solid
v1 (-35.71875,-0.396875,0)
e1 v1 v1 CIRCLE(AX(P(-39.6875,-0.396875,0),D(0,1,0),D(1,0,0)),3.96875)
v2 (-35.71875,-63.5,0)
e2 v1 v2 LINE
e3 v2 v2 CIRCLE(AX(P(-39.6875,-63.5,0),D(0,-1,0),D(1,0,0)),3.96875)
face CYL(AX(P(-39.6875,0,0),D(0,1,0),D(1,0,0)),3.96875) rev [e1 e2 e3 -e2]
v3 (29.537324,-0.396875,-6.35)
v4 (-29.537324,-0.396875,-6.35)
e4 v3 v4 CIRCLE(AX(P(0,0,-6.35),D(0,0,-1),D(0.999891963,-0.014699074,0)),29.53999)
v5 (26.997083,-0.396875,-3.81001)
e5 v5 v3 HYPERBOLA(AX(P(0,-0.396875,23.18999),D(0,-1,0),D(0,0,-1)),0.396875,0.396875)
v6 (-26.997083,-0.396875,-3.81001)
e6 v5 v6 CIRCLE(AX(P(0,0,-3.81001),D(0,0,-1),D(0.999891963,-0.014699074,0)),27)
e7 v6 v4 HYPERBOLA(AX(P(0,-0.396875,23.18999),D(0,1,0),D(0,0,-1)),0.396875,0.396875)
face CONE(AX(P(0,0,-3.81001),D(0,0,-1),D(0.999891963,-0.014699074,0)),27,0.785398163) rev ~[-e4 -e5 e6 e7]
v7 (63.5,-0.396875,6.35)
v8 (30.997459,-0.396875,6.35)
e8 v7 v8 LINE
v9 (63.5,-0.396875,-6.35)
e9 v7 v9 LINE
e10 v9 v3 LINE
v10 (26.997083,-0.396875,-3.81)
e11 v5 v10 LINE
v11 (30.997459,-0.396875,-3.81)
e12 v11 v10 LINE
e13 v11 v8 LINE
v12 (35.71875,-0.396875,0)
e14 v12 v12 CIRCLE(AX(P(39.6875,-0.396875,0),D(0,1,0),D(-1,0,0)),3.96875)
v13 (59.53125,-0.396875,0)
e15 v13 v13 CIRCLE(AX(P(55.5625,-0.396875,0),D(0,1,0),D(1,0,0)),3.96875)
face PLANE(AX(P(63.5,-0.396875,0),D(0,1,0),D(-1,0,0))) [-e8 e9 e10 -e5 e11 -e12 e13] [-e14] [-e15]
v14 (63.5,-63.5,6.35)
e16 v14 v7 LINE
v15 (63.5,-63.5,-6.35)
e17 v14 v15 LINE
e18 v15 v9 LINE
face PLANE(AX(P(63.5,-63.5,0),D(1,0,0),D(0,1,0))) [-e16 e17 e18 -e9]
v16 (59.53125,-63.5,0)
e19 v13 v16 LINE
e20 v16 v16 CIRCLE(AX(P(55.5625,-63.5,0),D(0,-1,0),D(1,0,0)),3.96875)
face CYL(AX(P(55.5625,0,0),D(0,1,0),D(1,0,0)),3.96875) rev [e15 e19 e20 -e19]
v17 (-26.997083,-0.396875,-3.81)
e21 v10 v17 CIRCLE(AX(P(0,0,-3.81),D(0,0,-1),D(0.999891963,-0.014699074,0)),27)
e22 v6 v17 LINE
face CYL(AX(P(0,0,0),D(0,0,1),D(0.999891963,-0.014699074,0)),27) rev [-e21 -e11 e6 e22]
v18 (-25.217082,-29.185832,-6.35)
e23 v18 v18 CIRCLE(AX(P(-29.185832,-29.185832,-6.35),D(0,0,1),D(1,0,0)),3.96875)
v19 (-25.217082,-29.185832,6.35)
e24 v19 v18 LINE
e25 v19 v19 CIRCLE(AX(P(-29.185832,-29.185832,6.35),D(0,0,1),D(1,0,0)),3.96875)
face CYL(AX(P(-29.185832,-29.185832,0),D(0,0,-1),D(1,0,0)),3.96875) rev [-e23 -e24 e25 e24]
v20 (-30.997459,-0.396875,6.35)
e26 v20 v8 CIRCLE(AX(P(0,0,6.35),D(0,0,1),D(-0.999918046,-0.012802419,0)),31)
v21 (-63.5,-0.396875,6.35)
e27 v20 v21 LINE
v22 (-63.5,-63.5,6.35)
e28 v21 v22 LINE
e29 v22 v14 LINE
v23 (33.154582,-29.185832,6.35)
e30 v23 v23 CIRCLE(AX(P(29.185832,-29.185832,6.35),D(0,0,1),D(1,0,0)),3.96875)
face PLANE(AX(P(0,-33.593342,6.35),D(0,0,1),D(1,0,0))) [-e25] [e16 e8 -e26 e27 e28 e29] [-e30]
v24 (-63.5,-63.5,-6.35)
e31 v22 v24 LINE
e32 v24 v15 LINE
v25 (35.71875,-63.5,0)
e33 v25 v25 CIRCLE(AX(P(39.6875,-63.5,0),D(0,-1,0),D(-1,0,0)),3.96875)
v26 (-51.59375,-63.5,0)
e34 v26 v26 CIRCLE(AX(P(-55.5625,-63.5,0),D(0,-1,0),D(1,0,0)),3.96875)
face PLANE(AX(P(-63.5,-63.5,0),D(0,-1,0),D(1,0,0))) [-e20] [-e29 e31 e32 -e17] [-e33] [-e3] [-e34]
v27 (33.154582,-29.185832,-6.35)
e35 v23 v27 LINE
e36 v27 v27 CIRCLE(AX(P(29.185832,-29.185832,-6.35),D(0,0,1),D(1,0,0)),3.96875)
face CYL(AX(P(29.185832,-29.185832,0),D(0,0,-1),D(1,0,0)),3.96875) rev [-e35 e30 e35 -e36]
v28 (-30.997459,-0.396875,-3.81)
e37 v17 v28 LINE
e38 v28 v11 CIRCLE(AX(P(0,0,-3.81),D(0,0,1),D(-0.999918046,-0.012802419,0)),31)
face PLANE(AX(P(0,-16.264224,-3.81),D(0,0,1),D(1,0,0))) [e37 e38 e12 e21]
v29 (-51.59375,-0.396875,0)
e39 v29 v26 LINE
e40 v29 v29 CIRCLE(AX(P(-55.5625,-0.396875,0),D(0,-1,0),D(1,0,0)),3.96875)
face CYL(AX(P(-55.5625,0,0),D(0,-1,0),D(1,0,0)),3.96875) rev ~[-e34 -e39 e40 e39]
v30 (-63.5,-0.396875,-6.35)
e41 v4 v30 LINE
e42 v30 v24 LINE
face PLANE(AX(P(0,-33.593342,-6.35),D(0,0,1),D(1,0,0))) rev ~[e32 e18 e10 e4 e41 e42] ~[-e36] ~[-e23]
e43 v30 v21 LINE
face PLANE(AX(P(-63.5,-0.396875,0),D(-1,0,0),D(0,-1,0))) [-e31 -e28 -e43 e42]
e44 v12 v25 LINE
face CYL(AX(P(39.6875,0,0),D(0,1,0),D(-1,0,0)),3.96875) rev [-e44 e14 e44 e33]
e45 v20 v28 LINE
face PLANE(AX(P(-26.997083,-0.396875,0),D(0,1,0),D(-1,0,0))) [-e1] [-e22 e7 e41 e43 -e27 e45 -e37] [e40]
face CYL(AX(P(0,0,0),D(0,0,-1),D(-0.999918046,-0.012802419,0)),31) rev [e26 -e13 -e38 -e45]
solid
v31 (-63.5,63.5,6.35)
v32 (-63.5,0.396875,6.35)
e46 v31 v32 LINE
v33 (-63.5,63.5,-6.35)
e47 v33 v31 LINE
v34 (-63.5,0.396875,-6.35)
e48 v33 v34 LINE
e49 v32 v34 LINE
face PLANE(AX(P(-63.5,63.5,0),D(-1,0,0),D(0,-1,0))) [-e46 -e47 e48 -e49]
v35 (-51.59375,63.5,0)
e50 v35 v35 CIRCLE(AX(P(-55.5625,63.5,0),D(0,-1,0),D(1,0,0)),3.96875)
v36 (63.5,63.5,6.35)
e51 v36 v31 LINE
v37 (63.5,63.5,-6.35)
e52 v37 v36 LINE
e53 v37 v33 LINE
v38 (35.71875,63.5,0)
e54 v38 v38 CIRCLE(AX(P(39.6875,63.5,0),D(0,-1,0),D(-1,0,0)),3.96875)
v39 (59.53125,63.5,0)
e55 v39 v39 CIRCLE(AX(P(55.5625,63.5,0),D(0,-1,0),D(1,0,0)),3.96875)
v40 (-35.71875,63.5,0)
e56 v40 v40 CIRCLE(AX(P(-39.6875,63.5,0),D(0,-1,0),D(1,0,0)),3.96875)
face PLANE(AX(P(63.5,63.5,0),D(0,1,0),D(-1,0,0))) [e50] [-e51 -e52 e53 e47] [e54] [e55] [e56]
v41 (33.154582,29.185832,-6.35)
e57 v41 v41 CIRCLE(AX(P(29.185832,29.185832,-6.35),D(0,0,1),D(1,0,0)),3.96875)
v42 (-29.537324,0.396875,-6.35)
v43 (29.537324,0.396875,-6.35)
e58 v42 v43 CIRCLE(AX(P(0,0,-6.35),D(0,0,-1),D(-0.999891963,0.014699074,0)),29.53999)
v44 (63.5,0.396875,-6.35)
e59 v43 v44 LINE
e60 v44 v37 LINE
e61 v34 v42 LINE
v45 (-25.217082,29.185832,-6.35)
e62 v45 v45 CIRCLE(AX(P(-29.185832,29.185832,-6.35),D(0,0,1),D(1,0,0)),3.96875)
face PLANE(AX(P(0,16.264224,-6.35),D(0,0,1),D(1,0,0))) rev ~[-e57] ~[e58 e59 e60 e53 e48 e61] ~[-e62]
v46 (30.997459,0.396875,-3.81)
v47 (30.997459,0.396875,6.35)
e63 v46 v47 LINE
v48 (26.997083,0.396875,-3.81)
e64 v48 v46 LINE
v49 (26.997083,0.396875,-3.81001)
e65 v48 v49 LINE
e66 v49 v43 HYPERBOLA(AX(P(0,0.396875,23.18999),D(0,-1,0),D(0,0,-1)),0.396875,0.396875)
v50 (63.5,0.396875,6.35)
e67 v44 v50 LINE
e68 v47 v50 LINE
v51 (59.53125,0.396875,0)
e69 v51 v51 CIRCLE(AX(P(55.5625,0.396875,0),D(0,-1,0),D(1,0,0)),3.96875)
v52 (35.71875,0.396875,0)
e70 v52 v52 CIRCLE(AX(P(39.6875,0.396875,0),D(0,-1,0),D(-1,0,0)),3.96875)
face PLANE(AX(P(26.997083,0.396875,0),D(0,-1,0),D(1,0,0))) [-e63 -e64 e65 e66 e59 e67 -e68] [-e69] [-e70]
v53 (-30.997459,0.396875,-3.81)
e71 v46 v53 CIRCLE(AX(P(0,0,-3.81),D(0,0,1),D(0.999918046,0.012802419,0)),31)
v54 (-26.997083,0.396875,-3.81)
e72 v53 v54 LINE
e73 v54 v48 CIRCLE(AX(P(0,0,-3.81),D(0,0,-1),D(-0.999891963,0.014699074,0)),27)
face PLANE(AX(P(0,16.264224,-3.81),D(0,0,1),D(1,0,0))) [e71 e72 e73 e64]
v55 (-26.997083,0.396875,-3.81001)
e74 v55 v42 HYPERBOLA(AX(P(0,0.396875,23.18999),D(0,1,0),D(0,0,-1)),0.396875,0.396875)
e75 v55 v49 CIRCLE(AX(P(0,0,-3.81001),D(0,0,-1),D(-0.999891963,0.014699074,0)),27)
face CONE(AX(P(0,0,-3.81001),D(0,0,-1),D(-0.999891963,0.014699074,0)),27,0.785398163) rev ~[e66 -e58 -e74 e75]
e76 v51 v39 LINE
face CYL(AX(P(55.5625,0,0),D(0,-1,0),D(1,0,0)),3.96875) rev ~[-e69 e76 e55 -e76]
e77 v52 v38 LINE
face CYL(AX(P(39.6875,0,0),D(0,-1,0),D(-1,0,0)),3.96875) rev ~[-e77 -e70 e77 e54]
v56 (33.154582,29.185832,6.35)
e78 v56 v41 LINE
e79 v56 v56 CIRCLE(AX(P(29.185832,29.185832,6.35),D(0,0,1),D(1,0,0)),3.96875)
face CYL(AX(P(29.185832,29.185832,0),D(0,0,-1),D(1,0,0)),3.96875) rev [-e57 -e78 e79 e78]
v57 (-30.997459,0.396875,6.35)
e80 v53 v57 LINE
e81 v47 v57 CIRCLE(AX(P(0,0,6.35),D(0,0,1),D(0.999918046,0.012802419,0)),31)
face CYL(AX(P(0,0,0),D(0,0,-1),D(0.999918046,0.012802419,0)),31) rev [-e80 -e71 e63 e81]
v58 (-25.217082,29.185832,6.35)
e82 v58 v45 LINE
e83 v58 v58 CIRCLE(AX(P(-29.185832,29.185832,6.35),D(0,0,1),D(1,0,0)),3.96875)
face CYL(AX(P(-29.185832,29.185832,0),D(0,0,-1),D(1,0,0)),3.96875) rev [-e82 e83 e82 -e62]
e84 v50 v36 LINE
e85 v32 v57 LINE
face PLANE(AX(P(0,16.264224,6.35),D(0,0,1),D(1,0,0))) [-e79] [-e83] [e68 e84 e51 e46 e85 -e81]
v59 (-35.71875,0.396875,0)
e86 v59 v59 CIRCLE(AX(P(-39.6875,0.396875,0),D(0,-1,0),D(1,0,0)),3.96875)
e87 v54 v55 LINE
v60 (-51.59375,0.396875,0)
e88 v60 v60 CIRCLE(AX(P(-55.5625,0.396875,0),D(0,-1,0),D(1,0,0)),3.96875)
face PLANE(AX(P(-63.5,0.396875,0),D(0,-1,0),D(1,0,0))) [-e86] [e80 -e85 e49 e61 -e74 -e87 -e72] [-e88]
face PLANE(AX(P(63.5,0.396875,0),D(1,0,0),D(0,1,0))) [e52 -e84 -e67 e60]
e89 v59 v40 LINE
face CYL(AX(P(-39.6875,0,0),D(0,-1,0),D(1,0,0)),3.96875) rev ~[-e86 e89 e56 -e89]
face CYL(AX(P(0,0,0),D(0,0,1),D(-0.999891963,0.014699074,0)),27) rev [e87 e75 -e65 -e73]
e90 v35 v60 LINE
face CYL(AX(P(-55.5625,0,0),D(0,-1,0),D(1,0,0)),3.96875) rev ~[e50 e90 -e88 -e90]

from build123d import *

# Parameters (mm, degrees)
F0_R          = 3.96875
F1_DEPTH      = 6.35
F2_DEPTH      = 3.81
F2_DEPTH_BACK = 6.35
F3_SIZE       = 2.53999
F3_2_SIZE     = 2.53999
F4_R          = 3.96875
F5_DEPTH      = 63.5


# Not quite as in the source:
# - a fillet or chamfer is up to 0.001 mm smaller than in the source, because OpenCascade refuses the exact size


with BuildPart() as f1:
    # F0 (on Top) → F1 (new body, symmetric)
    with BuildSketch(Plane.XY):
        with BuildLine():
            Line((26.9970829949, 0.396875), (30.9974594158, 0.396875))
            ThreePointArc((30.9974594158, 0.396875), (0, 31), (-30.9974594158, 0.396875))
            Line((-30.9974594158, 0.396875), (-26.9970829949, 0.396875))
            ThreePointArc((-26.9970829949, 0.396875), (0, 27), (26.9970829949, 0.396875))
        make_face()
        with BuildLine():
            ThreePointArc((-30.9974594158, 0.396875), (0, 31), (30.9974594158, 0.396875))
            Line((30.9974594158, 0.396875), (63.5, 0.396875))
            Line((63.5, 0.396875), (63.5, 63.5))
            Line((63.5, 63.5), (-63.5, 63.5))
            Line((-63.5, 63.5), (-63.5, 0.396875))
            Line((-63.5, 0.396875), (-30.9974594158, 0.396875))
        make_face()
        with Locations((-29.1858323935, 29.1858323935)):
            Circle(F0_R, mode=Mode.SUBTRACT)
        with Locations((29.1858323935, 29.1858323935)):
            Circle(F0_R, mode=Mode.SUBTRACT)
    extrude(amount=F1_DEPTH, both=True)


with BuildPart() as f1b:
    # F0 (on Top) → F1, piece 2 (new body, symmetric)
    with BuildSketch(Plane.XY):
        with BuildLine():
            Line((63.5, -0.396875), (30.9974594158, -0.396875))
            ThreePointArc((30.9974594158, -0.396875), (0, -31), (-30.9974594158, -0.396875))
            Line((-30.9974594158, -0.396875), (-63.5, -0.396875))
            Line((-63.5, -0.396875), (-63.5, -63.5))
            Line((-63.5, -63.5), (63.5, -63.5))
            Line((63.5, -63.5), (63.5, -0.396875))
        make_face()
        with Locations((-29.1858323935, -29.1858323935)):
            Circle(F0_R, mode=Mode.SUBTRACT)
        with Locations((29.1858323935, -29.1858323935)):
            Circle(F0_R, mode=Mode.SUBTRACT)
        with BuildLine():
            ThreePointArc((-30.9974594158, -0.396875), (0, -31), (30.9974594158, -0.396875))
            Line((30.9974594158, -0.396875), (26.9970829949, -0.396875))
            ThreePointArc((26.9970829949, -0.396875), (0, -27), (-26.9970829949, -0.396875))
            Line((-26.9970829949, -0.396875), (-30.9974594158, -0.396875))
        make_face()
    extrude(amount=F1_DEPTH, both=True)


with BuildPart() as f2_tool:
    # F0 (on Top) → F2 (new body, two sides)
    with BuildSketch(Plane.XY) as f2_sk:
        with BuildLine():
            ThreePointArc((-30.9974594158, -0.396875), (0, -31), (30.9974594158, -0.396875))
            Line((30.9974594158, -0.396875), (26.9970829949, -0.396875))
            ThreePointArc((26.9970829949, -0.396875), (0, -27), (-26.9970829949, -0.396875))
            Line((-26.9970829949, -0.396875), (-30.9974594158, -0.396875))
        make_face()
        with BuildLine():
            Line((26.9970829949, 0.396875), (30.9974594158, 0.396875))
            ThreePointArc((30.9974594158, 0.396875), (0, 31), (-30.9974594158, 0.396875))
            Line((-30.9974594158, 0.396875), (-26.9970829949, 0.396875))
            ThreePointArc((-26.9970829949, 0.396875), (0, 27), (26.9970829949, 0.396875))
        make_face()
    extrude(amount=-F2_DEPTH)
    extrude(f2_sk.sketch, amount=F2_DEPTH_BACK)


with BuildPart() as f1_1:
    add(f1.part)

    # F2: cut by f2_tool
    add(f2_tool.part, mode=Mode.SUBTRACT)

    # F3 (size 2.54 in the source; OpenCascade refuses exactly that, so slightly less here)
    f3_edges = [f1_1.edges().sort_by_distance(p)[0] for p in [
        (0, 27, -6.35),
    ]]
    chamfer(f3_edges, length=F3_SIZE)


with BuildPart() as f1b_1:
    add(f1b.part)

    # F2: cut by f2_tool
    add(f2_tool.part, mode=Mode.SUBTRACT)

    # F3#2 (size 2.54 in the source; OpenCascade refuses exactly that, so slightly less here)
    f3_2_edges = [f1b_1.edges().sort_by_distance(p)[0] for p in [
        (0, -27, -6.35),
    ]]
    chamfer(f3_2_edges, length=F3_2_SIZE)


with BuildPart() as f5_tool:
    # F4 (on Front) → F5 (new body, symmetric)
    with BuildSketch(Plane.XZ):
        with BuildLine():
            ThreePointArc((43.65625, 0), (39.6875, 3.96875), (35.71875, 0))
            ThreePointArc((35.71875, 0), (39.6875, -3.96875), (43.65625, 0))
        make_face()
        with Locations((55.5625, 0)):
            Circle(F4_R)
        with Locations((-39.6875, 0)):
            Circle(F4_R)
        with Locations((-55.5625, 0)):
            Circle(F4_R)
    extrude(amount=F5_DEPTH, both=True)


with BuildPart() as f1_2:
    add(f1_1.part)

    # F5: cut by f5_tool
    add(f5_tool.part, mode=Mode.SUBTRACT)


with BuildPart() as f1b_2:
    add(f1b_1.part)

    # F5: cut by f5_tool
    add(f5_tool.part, mode=Mode.SUBTRACT)


solid = Compound([f1_2.part, f1b_2.part])
